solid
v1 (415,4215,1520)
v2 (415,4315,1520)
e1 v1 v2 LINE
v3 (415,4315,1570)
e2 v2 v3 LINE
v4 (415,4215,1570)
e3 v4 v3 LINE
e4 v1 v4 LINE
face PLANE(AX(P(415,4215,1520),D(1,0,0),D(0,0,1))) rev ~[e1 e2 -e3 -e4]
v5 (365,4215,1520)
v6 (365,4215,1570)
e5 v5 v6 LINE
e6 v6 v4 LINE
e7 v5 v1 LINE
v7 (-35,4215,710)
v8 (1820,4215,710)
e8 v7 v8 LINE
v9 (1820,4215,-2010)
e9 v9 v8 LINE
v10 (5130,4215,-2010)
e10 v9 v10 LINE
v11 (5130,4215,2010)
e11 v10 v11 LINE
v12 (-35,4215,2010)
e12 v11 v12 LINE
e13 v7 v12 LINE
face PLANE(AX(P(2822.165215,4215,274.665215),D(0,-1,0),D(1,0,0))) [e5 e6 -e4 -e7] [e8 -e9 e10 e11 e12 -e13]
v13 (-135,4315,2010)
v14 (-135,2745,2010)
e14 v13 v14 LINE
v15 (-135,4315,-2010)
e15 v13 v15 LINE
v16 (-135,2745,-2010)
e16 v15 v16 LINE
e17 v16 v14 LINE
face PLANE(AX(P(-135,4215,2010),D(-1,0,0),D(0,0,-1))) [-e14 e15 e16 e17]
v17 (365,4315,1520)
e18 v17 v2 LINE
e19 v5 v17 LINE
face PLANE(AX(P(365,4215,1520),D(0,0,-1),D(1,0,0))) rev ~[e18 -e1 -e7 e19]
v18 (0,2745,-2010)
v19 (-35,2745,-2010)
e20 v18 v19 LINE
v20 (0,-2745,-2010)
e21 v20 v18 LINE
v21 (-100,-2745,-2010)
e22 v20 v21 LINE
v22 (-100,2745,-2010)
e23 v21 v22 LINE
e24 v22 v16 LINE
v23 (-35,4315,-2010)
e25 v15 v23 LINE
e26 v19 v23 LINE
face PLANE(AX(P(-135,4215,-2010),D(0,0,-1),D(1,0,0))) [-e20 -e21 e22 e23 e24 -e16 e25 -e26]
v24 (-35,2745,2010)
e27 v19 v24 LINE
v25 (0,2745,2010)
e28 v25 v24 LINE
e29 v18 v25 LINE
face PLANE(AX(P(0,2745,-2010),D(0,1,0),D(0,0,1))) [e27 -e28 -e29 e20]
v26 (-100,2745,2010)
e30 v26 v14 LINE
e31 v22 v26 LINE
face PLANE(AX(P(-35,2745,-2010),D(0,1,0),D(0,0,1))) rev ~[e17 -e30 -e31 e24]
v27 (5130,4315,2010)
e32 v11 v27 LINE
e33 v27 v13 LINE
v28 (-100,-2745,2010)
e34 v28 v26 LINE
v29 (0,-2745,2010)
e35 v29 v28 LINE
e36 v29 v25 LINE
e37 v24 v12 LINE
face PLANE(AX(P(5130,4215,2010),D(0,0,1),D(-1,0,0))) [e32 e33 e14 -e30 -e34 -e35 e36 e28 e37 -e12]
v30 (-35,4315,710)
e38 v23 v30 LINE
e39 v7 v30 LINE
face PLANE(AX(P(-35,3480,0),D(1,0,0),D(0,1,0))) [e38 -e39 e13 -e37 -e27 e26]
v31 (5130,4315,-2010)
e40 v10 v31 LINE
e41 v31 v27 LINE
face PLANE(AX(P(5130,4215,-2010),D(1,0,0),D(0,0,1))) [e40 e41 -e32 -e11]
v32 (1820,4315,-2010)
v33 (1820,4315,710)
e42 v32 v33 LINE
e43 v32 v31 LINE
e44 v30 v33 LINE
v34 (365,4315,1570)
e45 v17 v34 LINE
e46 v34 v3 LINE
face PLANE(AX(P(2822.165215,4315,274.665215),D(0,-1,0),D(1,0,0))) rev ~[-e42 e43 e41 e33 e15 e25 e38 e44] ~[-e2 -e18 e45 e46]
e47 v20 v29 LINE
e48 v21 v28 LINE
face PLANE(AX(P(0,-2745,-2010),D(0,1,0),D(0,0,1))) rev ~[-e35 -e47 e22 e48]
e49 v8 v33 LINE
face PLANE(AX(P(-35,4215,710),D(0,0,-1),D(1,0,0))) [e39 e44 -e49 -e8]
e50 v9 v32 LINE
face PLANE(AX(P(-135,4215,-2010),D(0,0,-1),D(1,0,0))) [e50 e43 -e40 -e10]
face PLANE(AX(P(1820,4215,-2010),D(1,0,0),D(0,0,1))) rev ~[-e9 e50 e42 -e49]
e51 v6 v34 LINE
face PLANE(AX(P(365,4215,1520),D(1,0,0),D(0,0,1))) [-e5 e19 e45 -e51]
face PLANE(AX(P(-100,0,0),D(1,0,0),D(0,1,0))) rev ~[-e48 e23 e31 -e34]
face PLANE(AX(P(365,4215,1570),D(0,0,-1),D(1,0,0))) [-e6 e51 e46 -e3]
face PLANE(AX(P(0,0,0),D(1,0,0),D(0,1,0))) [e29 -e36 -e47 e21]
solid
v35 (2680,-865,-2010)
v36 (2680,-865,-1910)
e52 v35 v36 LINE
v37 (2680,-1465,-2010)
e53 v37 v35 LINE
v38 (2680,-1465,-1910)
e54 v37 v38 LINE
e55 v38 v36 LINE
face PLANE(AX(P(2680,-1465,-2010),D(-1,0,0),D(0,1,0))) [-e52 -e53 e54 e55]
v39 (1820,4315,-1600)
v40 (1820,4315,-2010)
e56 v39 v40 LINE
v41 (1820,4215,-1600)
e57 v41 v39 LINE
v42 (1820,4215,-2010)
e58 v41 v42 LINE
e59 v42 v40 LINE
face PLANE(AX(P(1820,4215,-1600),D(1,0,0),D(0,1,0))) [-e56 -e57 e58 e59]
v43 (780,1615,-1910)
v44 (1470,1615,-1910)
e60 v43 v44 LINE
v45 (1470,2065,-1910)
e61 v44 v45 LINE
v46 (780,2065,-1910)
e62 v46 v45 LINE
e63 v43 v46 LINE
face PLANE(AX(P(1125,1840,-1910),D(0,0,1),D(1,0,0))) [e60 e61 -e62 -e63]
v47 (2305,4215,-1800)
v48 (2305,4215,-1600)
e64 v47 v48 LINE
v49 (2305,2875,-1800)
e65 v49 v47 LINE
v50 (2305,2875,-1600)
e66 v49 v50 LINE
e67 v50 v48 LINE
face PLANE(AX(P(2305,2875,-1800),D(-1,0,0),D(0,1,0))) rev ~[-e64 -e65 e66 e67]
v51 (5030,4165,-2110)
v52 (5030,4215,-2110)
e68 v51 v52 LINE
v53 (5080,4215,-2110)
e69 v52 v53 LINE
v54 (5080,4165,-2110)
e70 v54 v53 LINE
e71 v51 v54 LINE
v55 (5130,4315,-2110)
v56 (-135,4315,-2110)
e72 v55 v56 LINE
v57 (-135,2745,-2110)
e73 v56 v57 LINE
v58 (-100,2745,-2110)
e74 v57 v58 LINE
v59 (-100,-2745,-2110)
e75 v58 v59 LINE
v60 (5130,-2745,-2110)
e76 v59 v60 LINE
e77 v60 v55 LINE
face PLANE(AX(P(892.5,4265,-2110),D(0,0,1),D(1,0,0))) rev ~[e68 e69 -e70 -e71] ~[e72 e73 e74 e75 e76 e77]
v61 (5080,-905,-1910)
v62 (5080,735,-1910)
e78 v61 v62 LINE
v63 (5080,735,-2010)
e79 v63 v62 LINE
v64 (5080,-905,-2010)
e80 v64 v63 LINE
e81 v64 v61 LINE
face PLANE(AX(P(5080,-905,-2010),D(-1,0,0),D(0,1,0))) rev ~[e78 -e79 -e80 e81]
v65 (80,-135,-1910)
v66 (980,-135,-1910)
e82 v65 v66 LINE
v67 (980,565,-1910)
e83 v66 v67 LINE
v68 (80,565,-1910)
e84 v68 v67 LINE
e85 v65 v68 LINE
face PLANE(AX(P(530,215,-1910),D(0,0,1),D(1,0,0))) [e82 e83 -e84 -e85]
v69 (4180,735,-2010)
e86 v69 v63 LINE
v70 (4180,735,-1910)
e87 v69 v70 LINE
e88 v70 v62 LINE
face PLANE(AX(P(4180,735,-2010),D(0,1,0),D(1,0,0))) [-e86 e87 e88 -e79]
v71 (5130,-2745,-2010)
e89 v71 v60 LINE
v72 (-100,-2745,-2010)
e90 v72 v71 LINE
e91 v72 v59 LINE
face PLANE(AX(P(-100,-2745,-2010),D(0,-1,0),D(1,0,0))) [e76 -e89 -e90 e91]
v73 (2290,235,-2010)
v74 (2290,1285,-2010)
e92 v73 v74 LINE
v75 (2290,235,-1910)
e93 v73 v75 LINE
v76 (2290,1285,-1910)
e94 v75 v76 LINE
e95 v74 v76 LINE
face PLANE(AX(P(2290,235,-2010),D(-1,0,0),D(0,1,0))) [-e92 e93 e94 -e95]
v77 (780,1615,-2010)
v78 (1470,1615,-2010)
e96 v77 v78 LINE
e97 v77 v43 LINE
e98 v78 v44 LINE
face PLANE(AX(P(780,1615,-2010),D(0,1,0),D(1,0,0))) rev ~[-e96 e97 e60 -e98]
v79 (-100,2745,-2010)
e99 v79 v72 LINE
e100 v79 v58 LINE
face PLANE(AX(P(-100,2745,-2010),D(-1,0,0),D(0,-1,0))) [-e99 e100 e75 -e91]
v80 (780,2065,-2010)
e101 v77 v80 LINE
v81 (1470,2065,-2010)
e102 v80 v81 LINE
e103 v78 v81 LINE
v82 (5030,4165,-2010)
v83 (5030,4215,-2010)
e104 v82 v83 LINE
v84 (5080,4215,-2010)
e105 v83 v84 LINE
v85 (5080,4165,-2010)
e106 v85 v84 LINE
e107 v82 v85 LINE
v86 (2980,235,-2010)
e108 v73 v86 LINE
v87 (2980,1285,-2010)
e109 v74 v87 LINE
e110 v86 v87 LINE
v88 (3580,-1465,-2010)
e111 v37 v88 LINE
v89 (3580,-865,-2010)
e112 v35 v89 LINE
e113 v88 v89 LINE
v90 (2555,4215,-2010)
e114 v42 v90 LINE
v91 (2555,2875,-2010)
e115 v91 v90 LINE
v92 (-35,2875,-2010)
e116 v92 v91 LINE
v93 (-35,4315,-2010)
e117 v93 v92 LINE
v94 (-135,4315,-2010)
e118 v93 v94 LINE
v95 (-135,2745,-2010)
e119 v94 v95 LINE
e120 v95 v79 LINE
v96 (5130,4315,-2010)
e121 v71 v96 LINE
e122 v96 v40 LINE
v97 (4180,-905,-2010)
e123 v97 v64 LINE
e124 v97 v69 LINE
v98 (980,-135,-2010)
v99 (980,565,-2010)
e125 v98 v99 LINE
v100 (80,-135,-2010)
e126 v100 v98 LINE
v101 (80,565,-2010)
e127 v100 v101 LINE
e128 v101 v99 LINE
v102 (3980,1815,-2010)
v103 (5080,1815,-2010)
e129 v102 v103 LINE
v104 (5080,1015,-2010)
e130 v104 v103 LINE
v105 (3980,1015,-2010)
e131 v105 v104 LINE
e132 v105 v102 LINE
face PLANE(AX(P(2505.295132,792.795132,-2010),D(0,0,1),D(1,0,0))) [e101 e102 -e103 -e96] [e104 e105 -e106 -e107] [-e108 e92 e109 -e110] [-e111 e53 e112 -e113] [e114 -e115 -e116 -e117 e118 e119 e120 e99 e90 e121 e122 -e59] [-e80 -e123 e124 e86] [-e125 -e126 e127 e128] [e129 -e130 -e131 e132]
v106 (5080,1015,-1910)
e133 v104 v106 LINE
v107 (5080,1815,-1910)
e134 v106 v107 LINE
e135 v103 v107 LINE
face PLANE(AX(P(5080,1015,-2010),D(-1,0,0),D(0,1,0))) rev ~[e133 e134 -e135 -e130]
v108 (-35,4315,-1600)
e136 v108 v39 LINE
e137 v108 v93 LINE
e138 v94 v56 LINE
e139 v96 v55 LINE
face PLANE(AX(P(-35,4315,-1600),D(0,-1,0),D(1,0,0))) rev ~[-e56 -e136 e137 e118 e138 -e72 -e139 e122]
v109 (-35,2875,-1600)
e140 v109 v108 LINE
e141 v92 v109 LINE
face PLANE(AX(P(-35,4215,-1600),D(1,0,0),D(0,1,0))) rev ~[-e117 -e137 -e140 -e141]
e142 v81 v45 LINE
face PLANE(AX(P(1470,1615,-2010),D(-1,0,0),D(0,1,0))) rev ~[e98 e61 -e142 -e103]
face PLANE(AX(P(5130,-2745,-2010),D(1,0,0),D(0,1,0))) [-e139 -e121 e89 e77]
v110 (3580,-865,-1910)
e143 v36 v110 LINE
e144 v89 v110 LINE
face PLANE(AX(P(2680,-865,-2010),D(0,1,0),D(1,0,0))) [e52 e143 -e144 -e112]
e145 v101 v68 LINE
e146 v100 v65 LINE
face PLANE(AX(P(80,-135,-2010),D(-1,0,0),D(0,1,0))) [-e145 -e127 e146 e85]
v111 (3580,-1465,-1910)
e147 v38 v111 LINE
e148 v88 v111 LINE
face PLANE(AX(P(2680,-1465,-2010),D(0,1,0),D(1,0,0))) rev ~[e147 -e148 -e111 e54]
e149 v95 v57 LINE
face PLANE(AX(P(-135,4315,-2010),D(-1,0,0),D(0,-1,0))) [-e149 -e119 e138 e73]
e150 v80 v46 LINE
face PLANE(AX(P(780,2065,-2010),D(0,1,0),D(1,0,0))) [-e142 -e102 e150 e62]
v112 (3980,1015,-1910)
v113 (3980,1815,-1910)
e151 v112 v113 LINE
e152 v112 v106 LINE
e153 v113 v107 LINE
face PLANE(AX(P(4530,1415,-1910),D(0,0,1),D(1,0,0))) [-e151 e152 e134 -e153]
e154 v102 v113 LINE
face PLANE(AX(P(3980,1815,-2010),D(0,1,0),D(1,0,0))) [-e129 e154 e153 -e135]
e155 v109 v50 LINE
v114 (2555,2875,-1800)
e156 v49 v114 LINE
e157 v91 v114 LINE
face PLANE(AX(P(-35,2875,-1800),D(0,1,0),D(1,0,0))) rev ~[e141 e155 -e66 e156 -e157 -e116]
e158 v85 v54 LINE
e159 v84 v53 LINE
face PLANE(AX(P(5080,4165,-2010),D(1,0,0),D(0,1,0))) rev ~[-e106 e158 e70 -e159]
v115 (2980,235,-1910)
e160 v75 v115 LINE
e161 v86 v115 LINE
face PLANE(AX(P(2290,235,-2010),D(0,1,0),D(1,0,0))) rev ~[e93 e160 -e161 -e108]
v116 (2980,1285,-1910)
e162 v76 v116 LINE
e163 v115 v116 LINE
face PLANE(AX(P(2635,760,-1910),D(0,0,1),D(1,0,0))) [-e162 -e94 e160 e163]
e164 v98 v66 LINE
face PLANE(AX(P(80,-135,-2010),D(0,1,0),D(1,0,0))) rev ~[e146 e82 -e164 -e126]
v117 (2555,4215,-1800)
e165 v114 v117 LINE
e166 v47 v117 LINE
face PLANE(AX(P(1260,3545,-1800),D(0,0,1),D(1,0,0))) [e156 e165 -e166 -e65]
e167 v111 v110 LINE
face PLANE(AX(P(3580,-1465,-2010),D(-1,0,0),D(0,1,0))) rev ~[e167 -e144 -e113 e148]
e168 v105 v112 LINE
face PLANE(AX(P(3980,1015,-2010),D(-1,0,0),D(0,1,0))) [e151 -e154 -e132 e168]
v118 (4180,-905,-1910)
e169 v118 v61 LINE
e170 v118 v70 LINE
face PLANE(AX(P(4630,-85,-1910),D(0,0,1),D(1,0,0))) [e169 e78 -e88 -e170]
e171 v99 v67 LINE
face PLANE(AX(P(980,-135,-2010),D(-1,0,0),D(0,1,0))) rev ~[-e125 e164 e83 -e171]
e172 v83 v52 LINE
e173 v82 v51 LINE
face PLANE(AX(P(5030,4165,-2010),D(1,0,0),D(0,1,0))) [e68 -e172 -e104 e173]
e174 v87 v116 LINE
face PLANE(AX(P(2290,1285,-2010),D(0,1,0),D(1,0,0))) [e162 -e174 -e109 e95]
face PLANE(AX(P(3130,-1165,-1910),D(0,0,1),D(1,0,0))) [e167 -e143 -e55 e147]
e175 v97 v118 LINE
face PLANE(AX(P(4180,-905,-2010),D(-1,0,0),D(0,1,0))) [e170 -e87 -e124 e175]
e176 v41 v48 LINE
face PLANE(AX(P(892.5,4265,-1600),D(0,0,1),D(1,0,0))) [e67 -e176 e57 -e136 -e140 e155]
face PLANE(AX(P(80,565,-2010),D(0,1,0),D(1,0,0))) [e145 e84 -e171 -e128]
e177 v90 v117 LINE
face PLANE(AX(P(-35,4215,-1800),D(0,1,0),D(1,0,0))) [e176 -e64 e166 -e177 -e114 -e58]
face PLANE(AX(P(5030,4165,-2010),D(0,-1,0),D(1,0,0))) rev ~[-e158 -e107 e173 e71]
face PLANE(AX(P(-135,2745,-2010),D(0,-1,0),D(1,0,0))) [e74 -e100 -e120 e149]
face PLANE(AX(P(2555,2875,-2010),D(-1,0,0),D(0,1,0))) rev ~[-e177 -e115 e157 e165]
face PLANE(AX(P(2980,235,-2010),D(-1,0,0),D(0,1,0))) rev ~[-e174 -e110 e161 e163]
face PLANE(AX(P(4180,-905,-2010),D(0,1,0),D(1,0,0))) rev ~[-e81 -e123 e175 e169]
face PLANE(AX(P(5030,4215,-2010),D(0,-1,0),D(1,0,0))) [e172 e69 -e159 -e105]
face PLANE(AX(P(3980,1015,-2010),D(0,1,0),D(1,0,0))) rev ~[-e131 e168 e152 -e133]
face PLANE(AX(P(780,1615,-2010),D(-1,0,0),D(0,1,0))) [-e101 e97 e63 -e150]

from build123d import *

# Parameters (mm, degrees)
F0_W      = 5490
F0_H      = 4020
F1_DEPTH  = 100
F3_W      = 1470
F3_H      = 4020
F4_DEPTH  = 100
F6_W      = 1855
F6_H      = 2720
F7_DEPTH  = 100
F8_W      = 1855
F8_H      = 2720
F9_DEPTH  = 100
F12_DEPTH = 100
F13_W     = 1100
F13_H     = 800
F13_W_2   = 900
F13_H_2   = 1640
F13_H_3   = 600
F13_W_3   = 690
F13_H_4   = 1050
F13_H_5   = 700
F13_H_6   = 450
F14_DEPTH = 100
F15_W     = 2590
F15_H     = 1340
F16_DEPTH = 210
F17_W     = 2340
F17_H     = 1340
F18_DEPTH = 200
F19_W     = 1855
F19_H     = 100
F20_DEPTH = 510
F23_W     = 50
F23_H     = 50
F24_DEPTH = 100
F25_W     = 50
F25_H     = 50
F26_DEPTH = 100


with BuildPart() as f1:
    # F0 (on Right) → F1 (new body)
    with BuildSketch(Plane.YZ):
        Rectangle(F0_W, F0_H)
    extrude(amount=-F1_DEPTH)

    # F3 (on offset) → F4 (join)
    with BuildSketch(Plane.YZ.offset(-35)):
        with Locations((3480, 0)):
            Rectangle(F3_W, F3_H)
    extrude(amount=-F4_DEPTH)

    # F6 (on offset) → F7 (join)
    with BuildSketch(Plane.XZ.offset(-4215)):
        Polygon((5130, 2010), (-35, 2010), (-35, 710), (1820, 710), (1820, -2010), (5130, -2010), align=None)
        Polygon((-35, 710), (-35, 2010), (-135, 2010), (-135, -2010), (-35, -2010), align=None)
        with Locations((892.5, -650)):
            Rectangle(F6_W, F6_H)
    extrude(amount=-F7_DEPTH)

    # F8 (on face) → F9 (cut)
    with BuildSketch(Plane.XZ.offset(-4215)):
        with Locations((892.5, -650)):
            Rectangle(F8_W, F8_H)
    extrude(amount=-F9_DEPTH, mode=Mode.SUBTRACT)

    # F25 (on face) → F26 (cut)
    with BuildSketch(Plane.XZ.offset(-4215)):
        with Locations((390, 1545)):
            Rectangle(F25_W, F25_H)
    extrude(amount=-F26_DEPTH, mode=Mode.SUBTRACT)


with BuildPart() as f12:
    # F11 (on offset) → F12 (new body)
    with BuildSketch(Plane.XY.offset(-2010)):
        Polygon((-100, 2745), (-100, -2745), (0, -2745), (5130, -2745), (5130, 4215), (5130, 4315), (1820, 4315), (-35, 4315), (-135, 4315), (-135, 2745), align=None)
    extrude(amount=-F12_DEPTH)

    # F13 (on face) → F14 (join)
    with BuildSketch(Plane.XY.offset(-2010)):
        with Locations((4530, 1415)):
            Rectangle(F13_W, F13_H)
        with Locations((4630, -85)):
            Rectangle(F13_W_2, F13_H_2)
        with Locations((3130, -1165)):
            Rectangle(F13_W_2, F13_H_3)
        with Locations((2635, 760)):
            Rectangle(F13_W_3, F13_H_4)
        with Locations((530, 215)):
            Rectangle(F13_W_2, F13_H_5)
        with Locations((1125, 1840)):
            Rectangle(F13_W_3, F13_H_6)
    extrude(amount=F14_DEPTH)

    # F15 (on face) → F16 (join)
    with BuildSketch(Plane.XY.offset(-2010)):
        with Locations((1260, 3545)):
            Rectangle(F15_W, F15_H)
    extrude(amount=F16_DEPTH)

    # F17 (on face) → F18 (join)
    with BuildSketch(Plane.XY.offset(-1800)):
        with Locations((1135, 3545)):
            Rectangle(F17_W, F17_H)
    extrude(amount=F18_DEPTH)

    # F19 (on face) → F20 (join)
    with BuildSketch(Plane.XY.offset(-1600)):
        with Locations((892.5, 4265)):
            Rectangle(F19_W, F19_H)
    extrude(amount=-F20_DEPTH)

    # F21: union 

    # F23 (on face) → F24 (cut)
    with BuildSketch(Plane.XY.offset(-2010)):
        with Locations((5055, 4190)):
            Rectangle(F23_W, F23_H)
    extrude(amount=-F24_DEPTH, mode=Mode.SUBTRACT)


solid = Compound([f1.part, f12.part])
